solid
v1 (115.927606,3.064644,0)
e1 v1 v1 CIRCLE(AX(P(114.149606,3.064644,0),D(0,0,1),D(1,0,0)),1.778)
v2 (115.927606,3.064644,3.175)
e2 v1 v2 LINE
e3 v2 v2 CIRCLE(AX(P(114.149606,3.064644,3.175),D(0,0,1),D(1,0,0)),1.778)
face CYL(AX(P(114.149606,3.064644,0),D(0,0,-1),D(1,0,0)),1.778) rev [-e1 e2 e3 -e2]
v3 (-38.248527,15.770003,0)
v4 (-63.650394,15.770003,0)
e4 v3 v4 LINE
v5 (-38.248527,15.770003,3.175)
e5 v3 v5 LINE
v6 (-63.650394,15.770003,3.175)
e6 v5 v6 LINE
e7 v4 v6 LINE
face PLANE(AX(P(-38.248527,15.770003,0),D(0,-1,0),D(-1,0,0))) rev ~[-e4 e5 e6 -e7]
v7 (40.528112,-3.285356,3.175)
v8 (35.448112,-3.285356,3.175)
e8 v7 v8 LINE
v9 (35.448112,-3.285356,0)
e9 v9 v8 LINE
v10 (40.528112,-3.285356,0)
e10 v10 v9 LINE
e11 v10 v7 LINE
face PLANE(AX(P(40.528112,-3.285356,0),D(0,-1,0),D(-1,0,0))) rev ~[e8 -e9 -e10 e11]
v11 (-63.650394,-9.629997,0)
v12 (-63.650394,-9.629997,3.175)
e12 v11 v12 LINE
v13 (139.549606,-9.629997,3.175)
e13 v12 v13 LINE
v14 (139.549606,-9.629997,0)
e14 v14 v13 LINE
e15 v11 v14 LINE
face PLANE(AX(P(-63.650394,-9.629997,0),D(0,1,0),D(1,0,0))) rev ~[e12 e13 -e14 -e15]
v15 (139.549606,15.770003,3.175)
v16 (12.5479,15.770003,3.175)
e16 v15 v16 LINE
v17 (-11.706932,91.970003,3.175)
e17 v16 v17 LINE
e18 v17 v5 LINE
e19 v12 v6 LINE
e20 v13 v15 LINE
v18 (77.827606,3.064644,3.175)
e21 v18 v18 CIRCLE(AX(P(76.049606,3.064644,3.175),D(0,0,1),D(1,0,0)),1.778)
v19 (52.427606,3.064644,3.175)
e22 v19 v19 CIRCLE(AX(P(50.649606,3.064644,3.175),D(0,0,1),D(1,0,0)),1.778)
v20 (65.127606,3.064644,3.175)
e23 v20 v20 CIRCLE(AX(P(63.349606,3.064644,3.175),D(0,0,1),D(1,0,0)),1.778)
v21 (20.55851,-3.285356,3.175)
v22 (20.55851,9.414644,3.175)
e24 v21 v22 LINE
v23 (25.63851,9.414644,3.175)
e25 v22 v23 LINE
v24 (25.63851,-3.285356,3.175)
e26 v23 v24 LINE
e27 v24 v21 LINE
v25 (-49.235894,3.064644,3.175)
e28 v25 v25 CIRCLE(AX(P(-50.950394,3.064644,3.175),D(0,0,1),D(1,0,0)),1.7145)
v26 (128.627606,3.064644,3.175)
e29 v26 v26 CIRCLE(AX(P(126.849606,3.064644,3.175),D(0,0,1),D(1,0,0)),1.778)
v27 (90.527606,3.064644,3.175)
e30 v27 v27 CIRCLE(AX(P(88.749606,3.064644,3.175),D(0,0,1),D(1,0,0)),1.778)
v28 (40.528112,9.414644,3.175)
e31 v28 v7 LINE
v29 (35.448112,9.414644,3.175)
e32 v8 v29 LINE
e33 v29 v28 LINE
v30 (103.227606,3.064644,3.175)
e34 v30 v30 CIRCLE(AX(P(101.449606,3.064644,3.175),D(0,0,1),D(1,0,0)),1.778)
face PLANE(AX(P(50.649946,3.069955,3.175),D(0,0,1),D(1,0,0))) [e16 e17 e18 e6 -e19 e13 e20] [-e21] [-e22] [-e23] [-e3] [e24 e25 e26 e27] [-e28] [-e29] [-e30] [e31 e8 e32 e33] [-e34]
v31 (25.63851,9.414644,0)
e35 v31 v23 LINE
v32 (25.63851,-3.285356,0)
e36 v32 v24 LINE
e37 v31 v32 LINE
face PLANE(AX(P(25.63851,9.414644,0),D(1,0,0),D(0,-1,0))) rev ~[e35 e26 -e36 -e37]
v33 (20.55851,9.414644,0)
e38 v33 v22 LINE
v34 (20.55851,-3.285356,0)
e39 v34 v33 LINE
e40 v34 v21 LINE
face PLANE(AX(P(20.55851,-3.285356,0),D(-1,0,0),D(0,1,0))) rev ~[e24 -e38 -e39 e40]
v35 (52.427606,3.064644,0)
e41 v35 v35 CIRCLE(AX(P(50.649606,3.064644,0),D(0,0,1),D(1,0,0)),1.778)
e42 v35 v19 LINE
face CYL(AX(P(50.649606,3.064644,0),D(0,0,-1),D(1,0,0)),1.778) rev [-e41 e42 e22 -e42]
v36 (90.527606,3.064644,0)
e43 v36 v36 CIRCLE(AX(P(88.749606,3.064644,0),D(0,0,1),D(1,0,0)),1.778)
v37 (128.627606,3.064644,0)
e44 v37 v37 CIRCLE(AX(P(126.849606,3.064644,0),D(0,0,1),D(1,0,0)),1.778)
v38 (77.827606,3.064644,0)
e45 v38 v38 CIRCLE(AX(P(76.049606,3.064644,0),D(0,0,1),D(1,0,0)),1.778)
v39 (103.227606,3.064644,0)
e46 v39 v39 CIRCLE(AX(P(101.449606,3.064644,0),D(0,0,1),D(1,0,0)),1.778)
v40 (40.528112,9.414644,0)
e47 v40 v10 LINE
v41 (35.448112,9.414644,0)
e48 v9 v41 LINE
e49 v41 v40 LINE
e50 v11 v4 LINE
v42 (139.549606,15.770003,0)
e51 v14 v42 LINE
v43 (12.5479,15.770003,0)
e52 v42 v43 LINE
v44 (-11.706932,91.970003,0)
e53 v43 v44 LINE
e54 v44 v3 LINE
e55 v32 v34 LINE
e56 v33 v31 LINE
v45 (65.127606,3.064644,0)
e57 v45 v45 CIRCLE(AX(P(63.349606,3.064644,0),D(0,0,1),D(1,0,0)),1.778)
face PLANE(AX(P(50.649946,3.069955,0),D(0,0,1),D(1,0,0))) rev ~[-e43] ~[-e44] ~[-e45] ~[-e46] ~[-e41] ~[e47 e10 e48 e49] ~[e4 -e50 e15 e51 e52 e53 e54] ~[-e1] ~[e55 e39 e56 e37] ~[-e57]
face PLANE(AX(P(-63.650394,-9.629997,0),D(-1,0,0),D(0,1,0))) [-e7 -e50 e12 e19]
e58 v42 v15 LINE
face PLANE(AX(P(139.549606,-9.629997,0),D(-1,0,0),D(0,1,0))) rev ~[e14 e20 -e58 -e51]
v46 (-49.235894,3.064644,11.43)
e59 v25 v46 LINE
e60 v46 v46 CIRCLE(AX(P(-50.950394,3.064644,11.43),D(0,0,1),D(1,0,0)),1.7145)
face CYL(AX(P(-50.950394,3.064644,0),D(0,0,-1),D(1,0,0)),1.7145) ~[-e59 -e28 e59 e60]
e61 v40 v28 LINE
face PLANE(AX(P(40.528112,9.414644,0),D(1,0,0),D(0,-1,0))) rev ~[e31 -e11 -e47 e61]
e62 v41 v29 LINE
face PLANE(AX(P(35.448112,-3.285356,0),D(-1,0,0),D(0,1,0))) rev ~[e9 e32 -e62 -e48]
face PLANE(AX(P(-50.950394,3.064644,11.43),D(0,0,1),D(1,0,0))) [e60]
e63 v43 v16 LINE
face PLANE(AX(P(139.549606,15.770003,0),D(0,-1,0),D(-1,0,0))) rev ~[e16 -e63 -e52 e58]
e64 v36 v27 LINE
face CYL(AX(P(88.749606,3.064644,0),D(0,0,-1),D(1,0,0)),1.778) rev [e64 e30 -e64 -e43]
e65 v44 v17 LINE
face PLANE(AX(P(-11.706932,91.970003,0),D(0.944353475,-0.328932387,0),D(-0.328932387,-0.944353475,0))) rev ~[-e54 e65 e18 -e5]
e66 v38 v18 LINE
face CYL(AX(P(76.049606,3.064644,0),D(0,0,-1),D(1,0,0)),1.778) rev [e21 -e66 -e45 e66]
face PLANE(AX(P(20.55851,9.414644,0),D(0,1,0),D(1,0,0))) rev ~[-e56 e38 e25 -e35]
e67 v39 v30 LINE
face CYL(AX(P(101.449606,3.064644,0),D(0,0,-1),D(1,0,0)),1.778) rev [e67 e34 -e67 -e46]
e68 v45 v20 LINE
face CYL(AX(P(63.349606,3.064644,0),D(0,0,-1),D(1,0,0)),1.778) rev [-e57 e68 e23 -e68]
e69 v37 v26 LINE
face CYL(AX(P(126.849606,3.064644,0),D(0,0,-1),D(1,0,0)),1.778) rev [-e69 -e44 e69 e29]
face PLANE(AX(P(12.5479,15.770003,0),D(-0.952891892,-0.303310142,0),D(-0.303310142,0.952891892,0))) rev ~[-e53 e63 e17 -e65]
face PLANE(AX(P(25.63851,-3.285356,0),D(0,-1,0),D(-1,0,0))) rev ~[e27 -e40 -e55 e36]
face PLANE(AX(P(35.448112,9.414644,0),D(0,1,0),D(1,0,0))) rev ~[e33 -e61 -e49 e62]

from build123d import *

# Parameters (mm, degrees)
F0_R     = 1.778
F0_W     = 19.05
F0_H     = 25.4
F0_R_2   = 1.7145
F1_DEPTH = 3.175
F2_DEPTH = 11.43


# Not quite as in the source:
# - a feature names something its author has since deleted; it is built from what else it names


with BuildPart() as f1:
    # F0 (on Top) → F1 (new body)
    with BuildSketch(Plane.XY):
        Polygon((-38.2503936946, 15.7646441165), (-38.2503936946, -9.6299967694), (139.5496063054, -9.6299967694), (139.5496063054, 15.7700032306), (12.5479004732, 15.7700032306), (-11.7069316009, 15.7700032306), (-38.2485270353, 15.7700032306), align=None)
        Polygon((20.5585099757, -3.2853558835), (20.5585099757, 3.0646441165), (20.5585099757, 9.4146441165), (25.6385099757, 9.4146441165), (25.6385099757, -3.2853558835), align=None, mode=Mode.SUBTRACT)
        Polygon((35.4481115937, -3.2853558835), (35.4481115937, 3.0646441165), (35.4481115937, 9.4146441165), (40.5281115937, 9.4146441165), (40.5281115937, -3.2853558835), align=None, mode=Mode.SUBTRACT)
        with Locations((50.6496063054, 3.0646441165)):
            Circle(F0_R, mode=Mode.SUBTRACT)
        with Locations((63.3496063054, 3.0646441165)):
            Circle(F0_R, mode=Mode.SUBTRACT)
        with Locations((76.0496063054, 3.0646441165)):
            Circle(F0_R, mode=Mode.SUBTRACT)
        with Locations((88.7496063054, 3.0646441165)):
            Circle(F0_R, mode=Mode.SUBTRACT)
        with Locations((101.4496063054, 3.0646441165)):
            Circle(F0_R, mode=Mode.SUBTRACT)
        with Locations((114.1496063054, 3.0646441165)):
            Circle(F0_R, mode=Mode.SUBTRACT)
        with Locations((126.8496063054, 3.0646441165)):
            Circle(F0_R, mode=Mode.SUBTRACT)
        Polygon((-44.6003936946, 15.7700032306), (-44.6003936946, -9.6299967694), (-38.2503936946, -9.6299967694), (-38.2503936946, 15.7646441165), (-38.2485270353, 15.7700032306), align=None)
        with Locations((-54.1253936946, 3.0700032306)):
            Rectangle(F0_W, F0_H)
        with Locations((-50.9503936946, 3.0646441165)):
            Circle(F0_R_2, mode=Mode.SUBTRACT)
        Polygon((-11.7069316009, 91.9700032306), (-38.2485270353, 15.7700032306), (-11.7069316009, 15.7700032306), align=None)
        Polygon((-11.7069316009, 91.9700032306), (-11.7069316009, 15.7700032306), (12.5479004732, 15.7700032306), align=None)
    extrude(amount=F1_DEPTH)

    # F0 (on Top) → F2 (join)
    with BuildSketch(Plane.XY):
        with Locations((-50.9503936946, 3.0646441165)):
            Circle(F0_R_2)
    extrude(amount=F2_DEPTH)


solid = f1.part
